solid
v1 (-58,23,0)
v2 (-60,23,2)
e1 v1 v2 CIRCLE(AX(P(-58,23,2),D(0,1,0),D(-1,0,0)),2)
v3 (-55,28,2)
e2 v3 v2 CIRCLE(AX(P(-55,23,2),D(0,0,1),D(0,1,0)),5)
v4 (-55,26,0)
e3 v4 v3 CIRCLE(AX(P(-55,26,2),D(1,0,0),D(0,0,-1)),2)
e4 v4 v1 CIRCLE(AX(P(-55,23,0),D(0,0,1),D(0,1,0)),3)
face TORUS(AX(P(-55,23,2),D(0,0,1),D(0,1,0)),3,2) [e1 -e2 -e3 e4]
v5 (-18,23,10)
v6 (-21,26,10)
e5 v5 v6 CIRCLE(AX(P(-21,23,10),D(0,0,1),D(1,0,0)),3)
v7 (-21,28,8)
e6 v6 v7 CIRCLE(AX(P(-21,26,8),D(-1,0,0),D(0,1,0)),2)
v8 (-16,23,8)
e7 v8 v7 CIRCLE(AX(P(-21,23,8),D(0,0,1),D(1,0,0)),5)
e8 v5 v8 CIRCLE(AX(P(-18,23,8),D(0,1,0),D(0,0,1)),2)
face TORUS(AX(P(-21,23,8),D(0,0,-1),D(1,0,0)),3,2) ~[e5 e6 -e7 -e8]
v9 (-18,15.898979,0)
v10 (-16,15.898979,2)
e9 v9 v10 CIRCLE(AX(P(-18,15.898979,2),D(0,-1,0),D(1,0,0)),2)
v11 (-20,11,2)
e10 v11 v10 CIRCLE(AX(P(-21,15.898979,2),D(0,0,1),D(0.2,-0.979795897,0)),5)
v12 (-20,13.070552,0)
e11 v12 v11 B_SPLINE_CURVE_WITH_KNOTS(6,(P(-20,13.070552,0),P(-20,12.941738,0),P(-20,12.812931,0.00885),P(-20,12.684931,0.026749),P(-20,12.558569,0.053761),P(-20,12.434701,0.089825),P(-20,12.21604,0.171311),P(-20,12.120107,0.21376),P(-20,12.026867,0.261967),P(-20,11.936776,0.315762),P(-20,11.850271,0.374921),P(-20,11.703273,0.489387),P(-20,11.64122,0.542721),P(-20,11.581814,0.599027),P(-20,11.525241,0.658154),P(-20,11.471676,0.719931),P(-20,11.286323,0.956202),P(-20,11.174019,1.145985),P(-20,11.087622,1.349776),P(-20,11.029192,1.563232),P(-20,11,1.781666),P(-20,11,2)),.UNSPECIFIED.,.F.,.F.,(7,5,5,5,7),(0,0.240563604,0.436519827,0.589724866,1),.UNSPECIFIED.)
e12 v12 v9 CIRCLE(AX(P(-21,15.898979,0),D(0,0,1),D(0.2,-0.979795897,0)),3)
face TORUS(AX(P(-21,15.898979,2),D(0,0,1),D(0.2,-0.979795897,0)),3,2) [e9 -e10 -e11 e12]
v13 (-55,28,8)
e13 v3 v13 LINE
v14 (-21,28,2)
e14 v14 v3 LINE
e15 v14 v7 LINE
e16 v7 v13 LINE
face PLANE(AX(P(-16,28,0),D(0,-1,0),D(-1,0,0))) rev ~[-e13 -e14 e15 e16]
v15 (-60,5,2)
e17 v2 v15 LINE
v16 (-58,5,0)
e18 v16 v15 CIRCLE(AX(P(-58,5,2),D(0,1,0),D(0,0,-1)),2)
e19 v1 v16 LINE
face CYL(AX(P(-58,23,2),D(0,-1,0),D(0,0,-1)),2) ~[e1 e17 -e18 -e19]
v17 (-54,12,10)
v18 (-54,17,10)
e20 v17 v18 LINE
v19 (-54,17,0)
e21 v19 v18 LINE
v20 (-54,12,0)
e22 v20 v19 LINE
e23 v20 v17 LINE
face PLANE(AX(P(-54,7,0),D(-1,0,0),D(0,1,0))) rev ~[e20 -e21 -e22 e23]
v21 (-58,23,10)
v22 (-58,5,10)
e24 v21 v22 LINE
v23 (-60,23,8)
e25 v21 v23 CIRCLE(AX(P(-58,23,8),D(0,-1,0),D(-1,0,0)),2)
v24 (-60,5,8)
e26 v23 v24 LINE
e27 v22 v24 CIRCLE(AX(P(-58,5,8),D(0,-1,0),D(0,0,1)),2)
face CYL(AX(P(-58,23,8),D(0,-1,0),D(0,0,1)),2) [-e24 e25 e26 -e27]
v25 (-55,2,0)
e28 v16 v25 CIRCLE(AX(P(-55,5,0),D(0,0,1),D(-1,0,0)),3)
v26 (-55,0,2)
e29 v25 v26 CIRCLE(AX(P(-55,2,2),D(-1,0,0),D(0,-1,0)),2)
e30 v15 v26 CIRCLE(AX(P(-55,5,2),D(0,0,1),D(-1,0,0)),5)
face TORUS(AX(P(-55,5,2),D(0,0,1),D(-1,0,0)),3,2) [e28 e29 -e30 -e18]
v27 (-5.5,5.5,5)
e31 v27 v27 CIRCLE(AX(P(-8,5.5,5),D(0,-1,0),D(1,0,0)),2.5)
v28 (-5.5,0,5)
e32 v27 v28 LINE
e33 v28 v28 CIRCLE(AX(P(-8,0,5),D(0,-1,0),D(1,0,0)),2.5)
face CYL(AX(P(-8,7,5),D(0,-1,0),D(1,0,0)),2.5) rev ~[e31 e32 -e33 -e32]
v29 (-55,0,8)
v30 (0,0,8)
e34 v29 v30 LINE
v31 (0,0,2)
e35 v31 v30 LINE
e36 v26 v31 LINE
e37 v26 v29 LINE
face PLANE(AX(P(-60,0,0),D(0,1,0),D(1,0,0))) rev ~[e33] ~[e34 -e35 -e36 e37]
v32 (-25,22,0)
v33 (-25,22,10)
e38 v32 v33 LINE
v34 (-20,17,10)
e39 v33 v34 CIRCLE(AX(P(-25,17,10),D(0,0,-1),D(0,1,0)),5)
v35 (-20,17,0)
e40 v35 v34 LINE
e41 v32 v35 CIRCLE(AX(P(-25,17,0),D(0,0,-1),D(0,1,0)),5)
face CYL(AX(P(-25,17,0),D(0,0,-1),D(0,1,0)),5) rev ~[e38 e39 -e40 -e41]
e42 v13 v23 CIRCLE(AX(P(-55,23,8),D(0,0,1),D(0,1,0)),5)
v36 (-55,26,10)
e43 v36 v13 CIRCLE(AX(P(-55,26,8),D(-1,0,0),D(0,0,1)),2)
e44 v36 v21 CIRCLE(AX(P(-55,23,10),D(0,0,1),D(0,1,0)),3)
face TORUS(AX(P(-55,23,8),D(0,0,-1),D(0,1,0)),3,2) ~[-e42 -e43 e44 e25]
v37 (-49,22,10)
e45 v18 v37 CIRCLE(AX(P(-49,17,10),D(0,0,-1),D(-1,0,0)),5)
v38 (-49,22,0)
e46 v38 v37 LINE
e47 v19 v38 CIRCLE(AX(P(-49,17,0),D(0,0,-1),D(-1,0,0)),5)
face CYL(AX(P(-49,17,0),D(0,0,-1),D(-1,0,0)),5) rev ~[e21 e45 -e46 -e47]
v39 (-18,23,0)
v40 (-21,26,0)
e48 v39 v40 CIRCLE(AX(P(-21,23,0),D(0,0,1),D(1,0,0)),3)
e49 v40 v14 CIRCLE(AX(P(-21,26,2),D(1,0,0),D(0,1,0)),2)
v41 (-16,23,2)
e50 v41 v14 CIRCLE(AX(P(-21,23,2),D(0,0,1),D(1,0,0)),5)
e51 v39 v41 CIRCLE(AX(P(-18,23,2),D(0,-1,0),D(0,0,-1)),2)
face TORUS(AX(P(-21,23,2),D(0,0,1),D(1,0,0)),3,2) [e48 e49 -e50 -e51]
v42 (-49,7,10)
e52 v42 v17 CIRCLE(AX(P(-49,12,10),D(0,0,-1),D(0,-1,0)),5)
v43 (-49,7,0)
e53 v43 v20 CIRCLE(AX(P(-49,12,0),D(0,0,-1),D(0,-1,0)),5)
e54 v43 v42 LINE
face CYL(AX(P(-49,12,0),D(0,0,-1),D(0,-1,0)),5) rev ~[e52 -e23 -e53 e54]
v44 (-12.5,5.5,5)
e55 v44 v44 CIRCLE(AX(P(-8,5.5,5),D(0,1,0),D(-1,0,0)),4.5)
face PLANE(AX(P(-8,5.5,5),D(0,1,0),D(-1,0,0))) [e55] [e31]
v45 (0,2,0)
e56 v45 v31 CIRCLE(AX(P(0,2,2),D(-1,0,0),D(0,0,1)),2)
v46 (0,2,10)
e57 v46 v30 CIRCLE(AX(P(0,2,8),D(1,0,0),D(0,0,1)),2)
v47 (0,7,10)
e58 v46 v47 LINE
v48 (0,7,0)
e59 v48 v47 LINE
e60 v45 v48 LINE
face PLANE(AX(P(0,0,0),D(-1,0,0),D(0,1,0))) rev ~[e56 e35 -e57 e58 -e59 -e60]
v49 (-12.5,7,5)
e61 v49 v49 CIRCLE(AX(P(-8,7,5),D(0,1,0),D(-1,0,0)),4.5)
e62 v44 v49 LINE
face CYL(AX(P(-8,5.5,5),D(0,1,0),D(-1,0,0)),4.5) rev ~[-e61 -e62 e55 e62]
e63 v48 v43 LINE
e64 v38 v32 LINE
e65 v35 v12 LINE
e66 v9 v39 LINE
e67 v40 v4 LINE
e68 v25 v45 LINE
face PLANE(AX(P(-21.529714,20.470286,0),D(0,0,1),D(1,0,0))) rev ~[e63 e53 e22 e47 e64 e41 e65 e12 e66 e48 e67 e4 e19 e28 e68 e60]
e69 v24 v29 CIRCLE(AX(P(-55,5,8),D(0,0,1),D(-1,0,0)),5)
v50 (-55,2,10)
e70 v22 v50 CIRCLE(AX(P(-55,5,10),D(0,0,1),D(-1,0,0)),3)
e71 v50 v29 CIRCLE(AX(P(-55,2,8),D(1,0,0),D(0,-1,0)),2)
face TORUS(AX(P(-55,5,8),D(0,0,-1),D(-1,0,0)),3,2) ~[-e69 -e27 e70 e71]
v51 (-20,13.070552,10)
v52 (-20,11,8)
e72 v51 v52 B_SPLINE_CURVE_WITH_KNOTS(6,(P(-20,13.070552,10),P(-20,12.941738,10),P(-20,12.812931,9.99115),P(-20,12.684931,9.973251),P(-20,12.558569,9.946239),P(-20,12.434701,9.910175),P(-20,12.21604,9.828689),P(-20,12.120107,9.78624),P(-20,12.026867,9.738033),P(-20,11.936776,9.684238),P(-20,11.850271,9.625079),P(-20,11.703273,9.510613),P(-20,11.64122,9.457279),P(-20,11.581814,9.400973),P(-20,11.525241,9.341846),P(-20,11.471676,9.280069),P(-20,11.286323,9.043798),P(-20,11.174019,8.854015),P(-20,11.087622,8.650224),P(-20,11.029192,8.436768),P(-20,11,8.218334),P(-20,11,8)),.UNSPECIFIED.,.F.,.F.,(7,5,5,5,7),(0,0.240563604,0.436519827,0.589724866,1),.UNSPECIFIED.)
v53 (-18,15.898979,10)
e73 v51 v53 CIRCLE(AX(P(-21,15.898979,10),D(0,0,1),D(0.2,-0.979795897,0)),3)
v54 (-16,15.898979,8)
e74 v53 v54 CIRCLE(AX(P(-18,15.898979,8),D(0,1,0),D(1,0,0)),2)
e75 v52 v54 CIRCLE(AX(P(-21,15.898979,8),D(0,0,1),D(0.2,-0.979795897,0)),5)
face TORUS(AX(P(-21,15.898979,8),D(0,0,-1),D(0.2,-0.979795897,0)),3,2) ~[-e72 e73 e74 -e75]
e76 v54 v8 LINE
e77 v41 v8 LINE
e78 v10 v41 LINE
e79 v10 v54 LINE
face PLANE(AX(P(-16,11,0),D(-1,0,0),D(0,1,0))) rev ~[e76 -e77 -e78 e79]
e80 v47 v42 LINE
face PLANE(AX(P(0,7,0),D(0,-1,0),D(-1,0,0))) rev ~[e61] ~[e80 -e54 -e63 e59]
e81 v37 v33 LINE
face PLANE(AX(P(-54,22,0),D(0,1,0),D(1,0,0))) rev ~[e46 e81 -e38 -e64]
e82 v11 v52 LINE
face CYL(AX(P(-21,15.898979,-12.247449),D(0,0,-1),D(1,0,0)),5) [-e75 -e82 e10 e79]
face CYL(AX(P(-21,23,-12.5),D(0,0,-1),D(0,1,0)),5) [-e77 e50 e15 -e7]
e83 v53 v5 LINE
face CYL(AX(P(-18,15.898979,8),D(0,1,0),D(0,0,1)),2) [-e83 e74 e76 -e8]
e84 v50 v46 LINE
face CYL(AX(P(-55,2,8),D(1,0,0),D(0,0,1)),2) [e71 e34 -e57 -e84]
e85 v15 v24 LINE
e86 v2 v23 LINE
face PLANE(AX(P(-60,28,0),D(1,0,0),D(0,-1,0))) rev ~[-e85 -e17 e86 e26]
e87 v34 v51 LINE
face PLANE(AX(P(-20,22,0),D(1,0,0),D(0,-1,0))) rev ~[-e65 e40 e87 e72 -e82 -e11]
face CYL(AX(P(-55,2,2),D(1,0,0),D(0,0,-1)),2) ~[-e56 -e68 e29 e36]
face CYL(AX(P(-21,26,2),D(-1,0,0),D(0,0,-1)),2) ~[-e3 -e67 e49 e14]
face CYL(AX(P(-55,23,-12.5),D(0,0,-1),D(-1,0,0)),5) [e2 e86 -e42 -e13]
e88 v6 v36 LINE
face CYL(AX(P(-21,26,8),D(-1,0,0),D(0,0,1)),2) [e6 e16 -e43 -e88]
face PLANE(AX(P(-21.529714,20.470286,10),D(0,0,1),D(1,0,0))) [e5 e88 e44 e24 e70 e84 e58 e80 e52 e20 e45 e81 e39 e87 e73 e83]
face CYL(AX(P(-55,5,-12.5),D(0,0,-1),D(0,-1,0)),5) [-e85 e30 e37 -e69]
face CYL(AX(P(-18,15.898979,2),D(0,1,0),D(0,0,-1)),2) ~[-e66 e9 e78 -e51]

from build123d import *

# Parameters (mm, degrees)
F1_DEPTH       = 10
F3_D           = 5
F3_CBORE_D     = 9
F3_CBORE_DEPTH = 1.5
F4_T1_DEPTH    = 10
F4_T3_DEPTH    = 10
F4_T5_DEPTH    = 10
F4_T7_DEPTH    = 35
F4_T9_DEPTH    = 35
F4_T11_DEPTH   = 35
F4_T13_DEPTH   = 34.4948974279
F5_R           = 2


# Not quite as in the source:
# - a fillet or chamfer that OpenCascade refuses, or shapes differently, is made with other operations: its cross-section is extruded or revolved along the edge and cut away or added


with BuildPart() as f1:
    # F0 (on Top) → F1 (new body)
    with BuildSketch(Plane.XY):
        Polygon((-60, 0), (0, 0), (0, 7), (-54, 7), (-54, 22), (-20, 22), (-20, 11), (-16, 11), (-16, 28), (-60, 28), align=None)
    extrude(amount=F1_DEPTH)

    # F3 (through all)
    with Locations(Plane(origin=(0, 7, 0), x_dir=(-1, 0, 0), z_dir=(0, 1, 0))):
        with Locations((8, 5)):
            CounterBoreHole(F3_D / 2, F3_CBORE_D / 2, F3_CBORE_DEPTH)

    # F4: fillet of radius 5 on 7 edges, made by hand

    # F4_s2 → F4_t1 (join)
    with BuildSketch(Plane.XY):
        with BuildLine():
            ThreePointArc((-49, 7), (-52.5355339059, 8.4644660941), (-54, 12))
            Line((-54, 12), (-54, 7))
            Line((-54, 7), (-49, 7))
        make_face()
    extrude(amount=F4_T1_DEPTH)

    # F4_s4 → F4_t3 (join)
    with BuildSketch(Plane.XY):
        with BuildLine():
            ThreePointArc((-54, 17), (-52.5355339059, 20.5355339059), (-49, 22))
            Line((-49, 22), (-54, 22))
            Line((-54, 22), (-54, 17))
        make_face()
    extrude(amount=F4_T3_DEPTH)

    # F4_s6 → F4_t5 (join)
    with BuildSketch(Plane.XY):
        with BuildLine():
            ThreePointArc((-25, 22), (-21.4644660941, 20.5355339059), (-20, 17))
            Line((-20, 17), (-20, 22))
            Line((-20, 22), (-25, 22))
        make_face()
    extrude(amount=F4_T5_DEPTH)

    # F4_s8 → F4_t7 (cut)
    with BuildSketch(Plane.XY.offset(-12.5)):
        with BuildLine():
            ThreePointArc((-55, 0), (-58.5355339059, 1.4644660941), (-60, 5))
            Line((-60, 5), (-60, 0))
            Line((-60, 0), (-55, 0))
        make_face()
    extrude(amount=F4_T7_DEPTH, mode=Mode.SUBTRACT)

    # F4_s10 → F4_t9 (cut)
    with BuildSketch(Plane.XY.offset(-12.5)):
        with BuildLine():
            ThreePointArc((-60, 23), (-58.5355339059, 26.5355339059), (-55, 28))
            Line((-55, 28), (-60, 28))
            Line((-60, 28), (-60, 23))
        make_face()
    extrude(amount=F4_T9_DEPTH, mode=Mode.SUBTRACT)

    # F4_s12 → F4_t11 (cut)
    with BuildSketch(Plane.XY.offset(-12.5)):
        with BuildLine():
            ThreePointArc((-21, 28), (-17.4644660941, 26.5355339059), (-16, 23))
            Line((-16, 23), (-16, 28))
            Line((-16, 28), (-21, 28))
        make_face()
    extrude(amount=F4_T11_DEPTH, mode=Mode.SUBTRACT)

    # F4_s14 → F4_t13 (cut)
    with BuildSketch(Plane.XY.offset(-12.2474487139)):
        with BuildLine():
            ThreePointArc((-16, 15.8989794856), (-17.1270166538, 12.7367018254), (-20, 11))
            Line((-20, 11), (-16, 11))
            Line((-16, 11), (-16, 15.8989794856))
        make_face()
    extrude(amount=F4_T13_DEPTH, mode=Mode.SUBTRACT)

    # F5
    f5_edges = [f1.edges().sort_by_distance(p)[0] for p in [
        (-38, 28, 0),
        (-55, 28, 5),
        (-38, 28, 10),
        (-21, 28, 5),
        (-16, 19.44949, 0),
        (-16, 19.44949, 10),
        (-60, 14, 0),
        (-60, 14, 10),
        (-27.5, 0, 0),
        (-27.5, 0, 10),
        (-58.535534, 1.464466, 0),
        (-58.535534, 26.535534, 0),
        (-17.464466, 26.535534, 0),
        (-17.127017, 12.736702, 0),
        (-58.535534, 1.464466, 10),
        (-58.535534, 26.535534, 10),
        (-17.464466, 26.535534, 10),
        (-17.127017, 12.736702, 10),
    ]]
    fillet(f5_edges, radius=F5_R)


solid = f1.part
